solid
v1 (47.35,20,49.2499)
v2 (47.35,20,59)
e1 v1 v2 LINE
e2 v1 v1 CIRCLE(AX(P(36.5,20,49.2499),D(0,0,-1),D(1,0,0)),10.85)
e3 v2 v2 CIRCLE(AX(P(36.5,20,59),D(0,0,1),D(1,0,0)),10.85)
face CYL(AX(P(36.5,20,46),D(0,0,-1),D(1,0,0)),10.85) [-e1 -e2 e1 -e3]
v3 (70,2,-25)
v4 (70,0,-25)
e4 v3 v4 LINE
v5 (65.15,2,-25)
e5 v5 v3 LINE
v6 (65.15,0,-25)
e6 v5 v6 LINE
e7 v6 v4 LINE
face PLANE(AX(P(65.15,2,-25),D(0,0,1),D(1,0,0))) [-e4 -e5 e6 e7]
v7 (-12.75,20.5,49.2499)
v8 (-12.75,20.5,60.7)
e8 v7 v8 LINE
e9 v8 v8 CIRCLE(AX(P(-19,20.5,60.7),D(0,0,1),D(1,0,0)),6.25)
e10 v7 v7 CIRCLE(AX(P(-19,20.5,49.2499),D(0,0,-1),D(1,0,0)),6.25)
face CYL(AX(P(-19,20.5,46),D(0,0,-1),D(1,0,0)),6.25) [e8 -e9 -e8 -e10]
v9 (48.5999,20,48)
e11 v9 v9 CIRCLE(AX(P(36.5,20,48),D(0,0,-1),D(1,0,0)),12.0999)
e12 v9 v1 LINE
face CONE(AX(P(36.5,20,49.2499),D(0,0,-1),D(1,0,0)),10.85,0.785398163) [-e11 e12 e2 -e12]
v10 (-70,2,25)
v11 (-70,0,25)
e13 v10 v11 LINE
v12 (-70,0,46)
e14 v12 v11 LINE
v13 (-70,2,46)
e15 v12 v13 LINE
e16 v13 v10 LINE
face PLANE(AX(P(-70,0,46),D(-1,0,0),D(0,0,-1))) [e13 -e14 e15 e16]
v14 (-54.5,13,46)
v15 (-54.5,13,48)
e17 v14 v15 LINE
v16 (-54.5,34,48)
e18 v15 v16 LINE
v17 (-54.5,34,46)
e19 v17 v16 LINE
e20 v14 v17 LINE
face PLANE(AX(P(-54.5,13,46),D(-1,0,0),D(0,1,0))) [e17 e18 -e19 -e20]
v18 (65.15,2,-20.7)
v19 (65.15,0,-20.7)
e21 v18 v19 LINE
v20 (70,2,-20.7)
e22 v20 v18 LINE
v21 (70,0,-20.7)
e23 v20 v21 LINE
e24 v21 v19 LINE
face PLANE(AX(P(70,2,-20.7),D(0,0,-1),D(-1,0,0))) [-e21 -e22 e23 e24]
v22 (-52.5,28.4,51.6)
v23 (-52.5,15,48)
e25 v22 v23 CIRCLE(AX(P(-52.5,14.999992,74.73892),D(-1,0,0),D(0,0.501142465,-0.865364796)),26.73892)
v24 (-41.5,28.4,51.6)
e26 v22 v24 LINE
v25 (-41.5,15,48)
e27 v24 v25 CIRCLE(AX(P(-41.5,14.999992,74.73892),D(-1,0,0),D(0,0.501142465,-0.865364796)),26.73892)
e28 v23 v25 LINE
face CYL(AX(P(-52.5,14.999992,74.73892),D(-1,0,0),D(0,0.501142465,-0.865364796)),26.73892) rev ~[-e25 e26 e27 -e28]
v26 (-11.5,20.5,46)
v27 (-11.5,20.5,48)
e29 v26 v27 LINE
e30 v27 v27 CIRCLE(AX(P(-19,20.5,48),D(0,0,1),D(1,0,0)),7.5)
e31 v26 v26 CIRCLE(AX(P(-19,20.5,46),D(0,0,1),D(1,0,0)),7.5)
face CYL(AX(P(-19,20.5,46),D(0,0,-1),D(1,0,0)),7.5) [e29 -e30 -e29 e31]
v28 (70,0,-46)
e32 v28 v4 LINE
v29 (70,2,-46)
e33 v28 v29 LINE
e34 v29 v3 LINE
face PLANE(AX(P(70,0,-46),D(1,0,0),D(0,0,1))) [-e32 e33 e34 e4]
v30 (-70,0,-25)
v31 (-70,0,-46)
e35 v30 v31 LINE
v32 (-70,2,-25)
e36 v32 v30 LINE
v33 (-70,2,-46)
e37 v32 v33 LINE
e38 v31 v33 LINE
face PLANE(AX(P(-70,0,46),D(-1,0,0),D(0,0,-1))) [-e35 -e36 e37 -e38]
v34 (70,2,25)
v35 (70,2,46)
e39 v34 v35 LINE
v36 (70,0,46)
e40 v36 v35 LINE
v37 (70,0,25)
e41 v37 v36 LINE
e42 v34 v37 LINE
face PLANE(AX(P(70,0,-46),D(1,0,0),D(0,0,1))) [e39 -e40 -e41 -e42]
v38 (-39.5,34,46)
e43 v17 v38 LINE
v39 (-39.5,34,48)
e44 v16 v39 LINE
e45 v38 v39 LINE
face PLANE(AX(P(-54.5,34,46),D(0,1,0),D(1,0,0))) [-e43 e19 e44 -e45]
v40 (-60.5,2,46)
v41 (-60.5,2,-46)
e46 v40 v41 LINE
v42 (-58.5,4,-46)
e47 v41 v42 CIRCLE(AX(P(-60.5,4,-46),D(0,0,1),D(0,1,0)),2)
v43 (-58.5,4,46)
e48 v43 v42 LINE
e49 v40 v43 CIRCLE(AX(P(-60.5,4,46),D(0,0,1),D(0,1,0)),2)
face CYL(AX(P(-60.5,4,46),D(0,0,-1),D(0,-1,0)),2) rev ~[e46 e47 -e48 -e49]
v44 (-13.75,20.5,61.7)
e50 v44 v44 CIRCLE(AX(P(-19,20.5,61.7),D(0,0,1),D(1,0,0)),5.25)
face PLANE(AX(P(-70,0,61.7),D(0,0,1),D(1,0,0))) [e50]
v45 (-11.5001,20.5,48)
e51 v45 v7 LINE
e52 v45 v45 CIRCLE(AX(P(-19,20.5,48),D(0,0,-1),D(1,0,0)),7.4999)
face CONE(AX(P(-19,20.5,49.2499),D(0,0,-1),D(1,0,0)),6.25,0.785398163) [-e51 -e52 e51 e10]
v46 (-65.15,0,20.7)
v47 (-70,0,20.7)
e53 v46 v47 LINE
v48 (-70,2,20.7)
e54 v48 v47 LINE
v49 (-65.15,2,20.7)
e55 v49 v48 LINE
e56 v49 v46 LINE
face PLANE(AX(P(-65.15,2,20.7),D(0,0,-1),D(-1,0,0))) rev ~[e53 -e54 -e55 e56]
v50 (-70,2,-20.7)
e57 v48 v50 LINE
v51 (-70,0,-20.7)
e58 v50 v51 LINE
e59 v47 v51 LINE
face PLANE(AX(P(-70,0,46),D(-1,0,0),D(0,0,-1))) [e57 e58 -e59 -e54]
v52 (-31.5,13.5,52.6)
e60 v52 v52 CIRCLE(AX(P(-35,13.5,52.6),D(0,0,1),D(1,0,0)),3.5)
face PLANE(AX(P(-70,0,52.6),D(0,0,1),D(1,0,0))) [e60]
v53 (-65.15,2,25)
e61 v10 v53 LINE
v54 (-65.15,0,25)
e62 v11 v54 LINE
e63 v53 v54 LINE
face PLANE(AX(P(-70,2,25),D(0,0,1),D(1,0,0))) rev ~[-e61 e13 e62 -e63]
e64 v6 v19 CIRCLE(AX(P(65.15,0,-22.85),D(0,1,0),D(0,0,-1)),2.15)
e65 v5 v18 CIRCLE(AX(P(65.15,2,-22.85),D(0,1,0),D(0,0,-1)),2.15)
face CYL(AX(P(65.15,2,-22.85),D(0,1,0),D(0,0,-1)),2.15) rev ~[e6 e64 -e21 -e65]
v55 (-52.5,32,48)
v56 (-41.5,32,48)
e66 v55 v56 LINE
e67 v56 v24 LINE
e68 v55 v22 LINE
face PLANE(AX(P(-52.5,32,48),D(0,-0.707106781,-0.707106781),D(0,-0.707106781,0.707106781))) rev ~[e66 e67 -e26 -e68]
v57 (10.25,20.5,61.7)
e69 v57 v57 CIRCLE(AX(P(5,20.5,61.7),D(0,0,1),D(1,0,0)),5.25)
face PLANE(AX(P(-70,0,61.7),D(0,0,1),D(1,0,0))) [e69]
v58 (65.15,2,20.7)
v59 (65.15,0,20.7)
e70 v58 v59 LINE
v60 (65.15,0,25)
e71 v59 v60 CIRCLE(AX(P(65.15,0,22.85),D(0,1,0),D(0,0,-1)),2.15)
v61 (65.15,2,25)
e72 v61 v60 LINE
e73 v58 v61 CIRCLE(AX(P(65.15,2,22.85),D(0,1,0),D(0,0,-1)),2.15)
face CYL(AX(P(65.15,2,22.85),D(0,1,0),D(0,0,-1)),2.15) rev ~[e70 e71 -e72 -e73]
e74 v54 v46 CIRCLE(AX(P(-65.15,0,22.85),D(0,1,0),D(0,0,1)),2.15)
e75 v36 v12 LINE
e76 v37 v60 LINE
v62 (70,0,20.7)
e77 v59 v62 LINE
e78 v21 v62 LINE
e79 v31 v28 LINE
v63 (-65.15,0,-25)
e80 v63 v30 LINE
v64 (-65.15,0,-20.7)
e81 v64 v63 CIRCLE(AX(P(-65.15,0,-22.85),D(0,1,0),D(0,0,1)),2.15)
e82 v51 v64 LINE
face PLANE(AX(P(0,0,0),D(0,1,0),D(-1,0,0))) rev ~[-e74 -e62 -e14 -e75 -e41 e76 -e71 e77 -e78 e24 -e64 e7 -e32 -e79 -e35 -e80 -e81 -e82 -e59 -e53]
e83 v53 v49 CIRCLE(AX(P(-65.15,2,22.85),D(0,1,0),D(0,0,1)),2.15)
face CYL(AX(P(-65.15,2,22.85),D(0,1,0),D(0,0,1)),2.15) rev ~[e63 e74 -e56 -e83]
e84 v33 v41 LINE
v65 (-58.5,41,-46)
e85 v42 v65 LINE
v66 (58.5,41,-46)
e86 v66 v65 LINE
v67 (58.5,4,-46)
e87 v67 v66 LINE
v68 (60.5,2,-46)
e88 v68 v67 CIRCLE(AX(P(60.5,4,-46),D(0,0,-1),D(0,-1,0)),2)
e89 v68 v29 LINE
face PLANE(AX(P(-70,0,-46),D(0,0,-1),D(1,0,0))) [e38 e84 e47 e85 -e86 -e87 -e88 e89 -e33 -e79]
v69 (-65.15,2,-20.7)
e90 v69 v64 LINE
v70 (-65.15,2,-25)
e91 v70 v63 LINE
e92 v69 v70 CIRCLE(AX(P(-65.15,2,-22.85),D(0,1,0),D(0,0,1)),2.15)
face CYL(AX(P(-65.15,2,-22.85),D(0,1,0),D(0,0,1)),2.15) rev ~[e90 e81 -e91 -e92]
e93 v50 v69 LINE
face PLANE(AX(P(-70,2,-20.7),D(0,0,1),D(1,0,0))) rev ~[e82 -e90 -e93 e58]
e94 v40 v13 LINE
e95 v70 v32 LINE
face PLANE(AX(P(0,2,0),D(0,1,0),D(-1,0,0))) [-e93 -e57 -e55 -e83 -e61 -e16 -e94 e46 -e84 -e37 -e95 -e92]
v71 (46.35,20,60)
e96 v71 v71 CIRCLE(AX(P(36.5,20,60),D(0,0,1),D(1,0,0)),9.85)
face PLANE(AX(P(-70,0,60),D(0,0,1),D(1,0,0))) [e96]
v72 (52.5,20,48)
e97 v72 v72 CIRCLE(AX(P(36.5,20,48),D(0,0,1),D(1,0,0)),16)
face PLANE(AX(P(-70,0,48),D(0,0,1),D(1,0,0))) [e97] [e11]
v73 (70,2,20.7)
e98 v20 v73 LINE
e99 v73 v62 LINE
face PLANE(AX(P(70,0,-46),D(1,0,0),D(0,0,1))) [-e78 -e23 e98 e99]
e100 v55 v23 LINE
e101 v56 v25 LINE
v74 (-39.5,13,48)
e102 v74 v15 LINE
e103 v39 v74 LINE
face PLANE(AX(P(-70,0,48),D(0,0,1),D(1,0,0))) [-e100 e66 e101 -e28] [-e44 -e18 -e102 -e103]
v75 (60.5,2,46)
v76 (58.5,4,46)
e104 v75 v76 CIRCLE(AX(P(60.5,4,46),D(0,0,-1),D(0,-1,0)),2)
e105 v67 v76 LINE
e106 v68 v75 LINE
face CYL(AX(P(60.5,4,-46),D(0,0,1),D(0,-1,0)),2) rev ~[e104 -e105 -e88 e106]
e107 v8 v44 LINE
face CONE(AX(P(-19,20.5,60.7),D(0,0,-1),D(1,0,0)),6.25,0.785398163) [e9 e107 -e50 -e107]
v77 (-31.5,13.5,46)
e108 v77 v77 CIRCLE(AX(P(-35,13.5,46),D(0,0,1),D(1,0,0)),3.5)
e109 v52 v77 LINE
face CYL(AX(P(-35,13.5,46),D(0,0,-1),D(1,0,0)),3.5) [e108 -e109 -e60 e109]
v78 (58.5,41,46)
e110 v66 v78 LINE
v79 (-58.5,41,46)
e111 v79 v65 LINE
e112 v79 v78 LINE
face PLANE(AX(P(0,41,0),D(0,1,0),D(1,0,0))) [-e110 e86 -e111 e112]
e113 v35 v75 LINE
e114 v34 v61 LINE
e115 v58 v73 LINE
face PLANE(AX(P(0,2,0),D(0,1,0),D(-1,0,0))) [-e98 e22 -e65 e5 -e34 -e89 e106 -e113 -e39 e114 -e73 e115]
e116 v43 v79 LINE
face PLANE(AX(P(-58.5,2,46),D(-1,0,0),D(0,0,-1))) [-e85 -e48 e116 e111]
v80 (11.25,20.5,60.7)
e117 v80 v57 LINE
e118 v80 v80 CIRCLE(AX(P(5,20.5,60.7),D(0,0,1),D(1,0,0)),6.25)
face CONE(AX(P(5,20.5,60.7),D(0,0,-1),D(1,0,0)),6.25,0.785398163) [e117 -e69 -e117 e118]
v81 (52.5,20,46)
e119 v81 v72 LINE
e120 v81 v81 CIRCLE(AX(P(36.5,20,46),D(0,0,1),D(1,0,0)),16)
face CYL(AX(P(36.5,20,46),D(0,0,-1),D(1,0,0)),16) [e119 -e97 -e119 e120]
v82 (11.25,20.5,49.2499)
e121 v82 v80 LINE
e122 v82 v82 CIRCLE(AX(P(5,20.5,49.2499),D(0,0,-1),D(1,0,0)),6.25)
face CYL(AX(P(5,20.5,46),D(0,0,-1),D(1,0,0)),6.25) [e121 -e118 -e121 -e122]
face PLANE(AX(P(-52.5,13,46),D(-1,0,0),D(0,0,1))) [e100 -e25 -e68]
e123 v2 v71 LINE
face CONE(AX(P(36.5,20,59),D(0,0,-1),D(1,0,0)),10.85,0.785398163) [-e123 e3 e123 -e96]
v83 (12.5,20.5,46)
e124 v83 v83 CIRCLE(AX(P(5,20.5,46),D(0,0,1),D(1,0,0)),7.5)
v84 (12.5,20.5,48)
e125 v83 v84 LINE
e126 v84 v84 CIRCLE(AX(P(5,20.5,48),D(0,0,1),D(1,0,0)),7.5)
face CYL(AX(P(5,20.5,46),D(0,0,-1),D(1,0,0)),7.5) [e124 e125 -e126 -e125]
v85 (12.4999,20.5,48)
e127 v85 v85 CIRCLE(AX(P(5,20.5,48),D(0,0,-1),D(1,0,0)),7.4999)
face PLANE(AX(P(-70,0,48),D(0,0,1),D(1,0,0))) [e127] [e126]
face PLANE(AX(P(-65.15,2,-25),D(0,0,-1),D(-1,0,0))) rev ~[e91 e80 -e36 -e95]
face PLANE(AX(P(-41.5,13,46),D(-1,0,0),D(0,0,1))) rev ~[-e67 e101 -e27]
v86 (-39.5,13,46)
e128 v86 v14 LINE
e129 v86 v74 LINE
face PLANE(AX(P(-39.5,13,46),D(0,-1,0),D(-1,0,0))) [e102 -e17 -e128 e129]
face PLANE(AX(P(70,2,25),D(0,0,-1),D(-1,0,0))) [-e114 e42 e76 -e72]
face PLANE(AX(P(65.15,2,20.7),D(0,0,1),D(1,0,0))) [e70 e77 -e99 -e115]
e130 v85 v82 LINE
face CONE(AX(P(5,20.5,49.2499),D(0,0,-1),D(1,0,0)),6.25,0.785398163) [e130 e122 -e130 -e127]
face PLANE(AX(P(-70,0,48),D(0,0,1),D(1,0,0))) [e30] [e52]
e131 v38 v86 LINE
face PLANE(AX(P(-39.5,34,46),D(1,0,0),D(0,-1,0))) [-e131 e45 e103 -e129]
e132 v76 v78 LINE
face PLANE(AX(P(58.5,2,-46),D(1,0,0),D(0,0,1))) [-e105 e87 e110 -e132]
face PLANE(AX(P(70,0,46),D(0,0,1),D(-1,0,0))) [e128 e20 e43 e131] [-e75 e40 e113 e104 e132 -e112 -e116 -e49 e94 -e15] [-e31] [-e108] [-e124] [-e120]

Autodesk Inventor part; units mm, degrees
ref_plane "YZ Plane" through (0, 0, 0) normal (1, 0, 0) x (0, 1, 0)
sketch "Sketch1" plane through (0, 0, 0) normal (0, 1, 0) x (-1, 0, 0)
  line L0 (70, -46) -> (-70, -46)
  line L1 (-70, -46) -> (-70, 46)
  line L2 (-70, 46) -> (70, 46)
  line L3 (70, 46) -> (70, -46)
  point P0 (0, 0)
  point P1 (0, -46)
  point P2 (-70, 0)
  dimension "d0" = 92
  dimension "d1" = 140
extrude "Extrusion1" add sketch "Sketch1" along normal blind 2
sketch "Sketch2" plane through (0, 2, 0) normal (0, 1, 0) x (1, 0, 0)
  line L0 (70, 46) -> (-70, 46) projected
  line L1 (-70, 46) -> (-70, -46) projected
  line L2 (-70, -46) -> (70, -46) projected
  line L3 (70, -46) -> (70, 46) projected
  line L4 (70, 46) -> (-70, 46) projected
  line L5 (-70, -46) -> (70, -46) projected
  line L6 (-58.5, 46) -> (58.5, 46)
  line L7 (58.5, 46) -> (58.5, -46)
  line L8 (58.5, -46) -> (-58.5, -46)
  line L9 (-58.5, -46) -> (-58.5, 46)
  point P0 (0, 0)
  point P1 (0, 46)
  dimension "d4" = 117
extrude "Extrusion2" add sketch "Sketch2" along normal blind 39 contours L7 L2 L9 L0
fillet "Fillet1" radius 2 2 edges at (58.5, 2, 0) (-58.5, 2, 0)
sketch "Sketch3" plane through (-70, 0, 46) normal (0, 0, 1) x (1, 0, 0)
  line L0 (140, 0) -> (0, 0) projected
  line L1 (140, 0) -> (140, 2) projected
  line L2 (130.5, 2) -> (140, 2) projected
  arc A0 (128.5, 4) -> (130.5, 2) centre (130.5, 4) ccw projected
  line L3 (128.5, 4) -> (128.5, 41) projected
  line L4 (11.5, 41) -> (128.5, 41) projected
  line L5 (11.5, 4) -> (11.5, 41) projected
  arc A1 (9.5, 2) -> (11.5, 4) centre (9.5, 4) ccw projected
  line L6 (0, 2) -> (9.5, 2) projected
  line L7 (0, 0) -> (0, 2) projected
  circle A2 centre (106.5, 20) radius 16
  circle A3 centre (75, 20.5) radius 7.5
  circle A4 centre (51, 20.5) radius 7.5
  circle A5 centre (35, 13.5) radius 3.5
  line L8 (15.5, 34) -> (30.5, 34)
  line L9 (30.5, 34) -> (30.5, 13)
  line L10 (30.5, 13) -> (15.5, 13)
  line L11 (15.5, 13) -> (15.5, 34)
  point P0 (70, 0)
  dimension "d8" = 32
  dimension "d9" = 15
  dimension "d10" = 15
  dimension "d11" = 7
  dimension "d12" = 15
  dimension "d13" = 21
  dimension "d14" = 4
  dimension "d15" = 7
  dimension "d17" = 10
  dimension "d18" = 20
  dimension "d19" = 13
  dimension "d20" = 32
  dimension "d21" = 13
  dimension "d22" = 56
  dimension "d23" = 4
  dimension "d24" = 6
extrude "Extrusion3" add sketch "Sketch3" along normal blind 2 contours A2 | A3 | A4 | A5 | L8 L9 L10 L11
sketch "Sketch4" plane through (-70, 0, 46) normal (0, 0, 1) x (1, 0, 0)
  circle A0 centre (35, 13.5) radius 3.5 projected
  circle A1 centre (51, 20.5) radius 7.5 projected
  circle A2 centre (75, 20.5) radius 7.5 projected
  circle A3 centre (106.5, 20) radius 16 projected
  circle A4 centre (51, 20.5) radius 6.25
  circle A5 centre (75, 20.5) radius 6.25
  point P0 (70, 0)
  dimension "d28" = 12.5
  dimension "d30" = 12.5
extrude "Extrusion4" add sketch "Sketch4" along normal blind 15.7 contours A4 | A5
sketch "Sketch5" plane through (-70, 0, 46) normal (0, 0, 1) x (1, 0, 0)
  circle A0 centre (106.5, 20) radius 16 projected
  circle A1 centre (106.5, 20) radius 10.85
  point P0 (70, 0)
  dimension "d33" = 21.7
extrude "Extrusion5" add sketch "Sketch5" along normal blind 14 contours A1
sketch "Sketch6" plane through (-70, 0, 46) normal (0, 0, 1) x (1, 0, 0)
  circle A0 centre (35, 13.5) radius 3.5 projected
  circle A1 centre (35, 13.5) radius 3.5
  point P0 (70, 0)
extrude "Extrusion6" add sketch "Sketch6" along normal blind 6.6
chamfer "Chamfer1" distance 1.25 angle 45 3 edges at (25.65, 20, 48) (-1.25, 20.5, 48) (-25.25, 20.5, 48)
chamfer "Chamfer2" distance 1 angle 45 3 edges at (-25.25, 20.5, 61.7) (-1.25, 20.5, 61.7) (25.65, 20, 60)
ref_plane "Work Plane1" through (-52.5, 13, 46) normal (-1, 0, 0) x (0, 0, 1)
ref_plane "Work Plane2" through (-41.5, 13, 46) normal (1, 0, 0) x (0, 0, -1)
sketch "Sketch7" plane through (-52.5, 13, 46) normal (-1, 0, 0) x (0, 0, 1)
  line L0 (0, 0) -> (0, 21) projected
  line L1 (0, 0) -> (2, 0) projected
  line L2 (2, 21) -> (2, 0) projected
  line L3 (0, 21) -> (2, 21) projected
  line L4 (2, -9) -> (2, 23) projected
  line L5 (2, 19) -> (2, 2)
  line L6 (2, 19) -> (5.6, 15.4)
  arc A0 (5.6, 15.4) -> (2, 2) centre (28.7389, 2) ccw
  point P0 (-46, -13)
  dimension "d46" = 2
  dimension "d47" = 2
  dimension "d48" = 45
  dimension "d49" = 3.6
extrude "Extrusion7" add sketch "Sketch7" against normal up to surface (11 mm away) contours L2 L6 A0
sketch "Sketch8" plane through (0, 2, 0) normal (0, 1, 0) x (1, 0, 0)
  line L0 (-60.5, 46) -> (-60.5, -46) projected
  line L1 (-60.5, 46) -> (-70, 46) projected
  line L2 (-70, 46) -> (-70, -46) projected
  line L3 (-70, -46) -> (-60.5, -46) projected
  line L4 (60.5, -46) -> (60.5, 46) projected
  line L5 (60.5, -46) -> (70, -46) projected
  line L6 (70, -46) -> (70, 46) projected
  line L7 (70, 46) -> (60.5, 46) projected
  line L8 (-70, 46) -> (-70, -46) projected
  line L9 (-70, 22.85) -> (-65.15, 22.85) construction
  line L10 (-70, 20.7) -> (-65.15, 20.7)
  line L11 (-65.15, 25) -> (-70, 25)
  arc A0 (-70, 25) -> (-70, 20.7) centre (-70, 22.85) ccw
  arc A1 (-65.15, 20.7) -> (-65.15, 25) centre (-65.15, 22.85) ccw
  line L12 (-70, -22.85) -> (-65.15, -22.85) construction
  line L13 (-70, -25) -> (-65.15, -25)
  line L14 (-65.15, -20.7) -> (-70, -20.7)
  arc A2 (-70, -20.7) -> (-70, -25) centre (-70, -22.85) ccw
  arc A3 (-65.15, -25) -> (-65.15, -20.7) centre (-65.15, -22.85) ccw
  line L15 (70, -22.85) -> (65.15, -22.85) construction
  line L16 (70, -25) -> (65.15, -25)
  line L17 (65.15, -20.7) -> (70, -20.7)
  arc A4 (70, -25) -> (70, -20.7) centre (70, -22.85) ccw
  arc A5 (65.15, -20.7) -> (65.15, -25) centre (65.15, -22.85) ccw
  line L18 (70, 46) -> (70, -46) projected
  line L19 (70, 22.85) -> (65.15, 22.85) construction
  line L20 (70, 20.7) -> (65.15, 20.7)
  line L21 (65.15, 25) -> (70, 25)
  arc A6 (70, 20.7) -> (70, 25) centre (70, 22.85) ccw
  arc A7 (65.15, 25) -> (65.15, 20.7) centre (65.15, 22.85) ccw
  line L22 (70, -46) -> (70, 46) projected
  point P0 (0, 0)
  point P1 (-67.575, 22.85)
  point P2 (-67.575, -22.85)
  point P3 (67.575, -22.85)
  point P4 (67.575, 22.85)
  dimension "d52" = 4.3
  dimension "d54" = 4.3
  dimension "d55" = 4.3
  dimension "d56" = 7
  dimension "d58" = 7
  dimension "d59" = 7
  dimension "d66" = 4.3
  dimension "d67" = 7
  dimension "d68" = 23.15
  dimension "d69" = 23.15
  dimension "d70" = 23.15
  dimension "d71" = 23.15
extrude "Extrusion8" cut sketch "Sketch8" against normal through all contours L11 A1 L10 L2 | L2 A0 | A2 L2 | L2 L14 A3 L13 | L16 A5 L17 L6 | L6 A4 | A6 L6 | L6 L20 A7 L21
equation "\"d10\" = d9"
equation "\"d21\" = d19"
equation "\"d28\" = d27"
equation "\"d30\" = d28"
equation "\"d54\" = d52"
equation "\"d55\" = d52"
equation "\"d58\" = d56"
equation "\"d59\" = d56"
equation "\"d66\" = d52"
equation "\"d67\" = d56"
equation "\"d69\" = d68"
equation "\"d70\" = d68"
equation "\"d71\" = d68"
equation "\"d27\" = 12.5"
properties part number "AmpLP2020A" material "Aluminum 6061"
